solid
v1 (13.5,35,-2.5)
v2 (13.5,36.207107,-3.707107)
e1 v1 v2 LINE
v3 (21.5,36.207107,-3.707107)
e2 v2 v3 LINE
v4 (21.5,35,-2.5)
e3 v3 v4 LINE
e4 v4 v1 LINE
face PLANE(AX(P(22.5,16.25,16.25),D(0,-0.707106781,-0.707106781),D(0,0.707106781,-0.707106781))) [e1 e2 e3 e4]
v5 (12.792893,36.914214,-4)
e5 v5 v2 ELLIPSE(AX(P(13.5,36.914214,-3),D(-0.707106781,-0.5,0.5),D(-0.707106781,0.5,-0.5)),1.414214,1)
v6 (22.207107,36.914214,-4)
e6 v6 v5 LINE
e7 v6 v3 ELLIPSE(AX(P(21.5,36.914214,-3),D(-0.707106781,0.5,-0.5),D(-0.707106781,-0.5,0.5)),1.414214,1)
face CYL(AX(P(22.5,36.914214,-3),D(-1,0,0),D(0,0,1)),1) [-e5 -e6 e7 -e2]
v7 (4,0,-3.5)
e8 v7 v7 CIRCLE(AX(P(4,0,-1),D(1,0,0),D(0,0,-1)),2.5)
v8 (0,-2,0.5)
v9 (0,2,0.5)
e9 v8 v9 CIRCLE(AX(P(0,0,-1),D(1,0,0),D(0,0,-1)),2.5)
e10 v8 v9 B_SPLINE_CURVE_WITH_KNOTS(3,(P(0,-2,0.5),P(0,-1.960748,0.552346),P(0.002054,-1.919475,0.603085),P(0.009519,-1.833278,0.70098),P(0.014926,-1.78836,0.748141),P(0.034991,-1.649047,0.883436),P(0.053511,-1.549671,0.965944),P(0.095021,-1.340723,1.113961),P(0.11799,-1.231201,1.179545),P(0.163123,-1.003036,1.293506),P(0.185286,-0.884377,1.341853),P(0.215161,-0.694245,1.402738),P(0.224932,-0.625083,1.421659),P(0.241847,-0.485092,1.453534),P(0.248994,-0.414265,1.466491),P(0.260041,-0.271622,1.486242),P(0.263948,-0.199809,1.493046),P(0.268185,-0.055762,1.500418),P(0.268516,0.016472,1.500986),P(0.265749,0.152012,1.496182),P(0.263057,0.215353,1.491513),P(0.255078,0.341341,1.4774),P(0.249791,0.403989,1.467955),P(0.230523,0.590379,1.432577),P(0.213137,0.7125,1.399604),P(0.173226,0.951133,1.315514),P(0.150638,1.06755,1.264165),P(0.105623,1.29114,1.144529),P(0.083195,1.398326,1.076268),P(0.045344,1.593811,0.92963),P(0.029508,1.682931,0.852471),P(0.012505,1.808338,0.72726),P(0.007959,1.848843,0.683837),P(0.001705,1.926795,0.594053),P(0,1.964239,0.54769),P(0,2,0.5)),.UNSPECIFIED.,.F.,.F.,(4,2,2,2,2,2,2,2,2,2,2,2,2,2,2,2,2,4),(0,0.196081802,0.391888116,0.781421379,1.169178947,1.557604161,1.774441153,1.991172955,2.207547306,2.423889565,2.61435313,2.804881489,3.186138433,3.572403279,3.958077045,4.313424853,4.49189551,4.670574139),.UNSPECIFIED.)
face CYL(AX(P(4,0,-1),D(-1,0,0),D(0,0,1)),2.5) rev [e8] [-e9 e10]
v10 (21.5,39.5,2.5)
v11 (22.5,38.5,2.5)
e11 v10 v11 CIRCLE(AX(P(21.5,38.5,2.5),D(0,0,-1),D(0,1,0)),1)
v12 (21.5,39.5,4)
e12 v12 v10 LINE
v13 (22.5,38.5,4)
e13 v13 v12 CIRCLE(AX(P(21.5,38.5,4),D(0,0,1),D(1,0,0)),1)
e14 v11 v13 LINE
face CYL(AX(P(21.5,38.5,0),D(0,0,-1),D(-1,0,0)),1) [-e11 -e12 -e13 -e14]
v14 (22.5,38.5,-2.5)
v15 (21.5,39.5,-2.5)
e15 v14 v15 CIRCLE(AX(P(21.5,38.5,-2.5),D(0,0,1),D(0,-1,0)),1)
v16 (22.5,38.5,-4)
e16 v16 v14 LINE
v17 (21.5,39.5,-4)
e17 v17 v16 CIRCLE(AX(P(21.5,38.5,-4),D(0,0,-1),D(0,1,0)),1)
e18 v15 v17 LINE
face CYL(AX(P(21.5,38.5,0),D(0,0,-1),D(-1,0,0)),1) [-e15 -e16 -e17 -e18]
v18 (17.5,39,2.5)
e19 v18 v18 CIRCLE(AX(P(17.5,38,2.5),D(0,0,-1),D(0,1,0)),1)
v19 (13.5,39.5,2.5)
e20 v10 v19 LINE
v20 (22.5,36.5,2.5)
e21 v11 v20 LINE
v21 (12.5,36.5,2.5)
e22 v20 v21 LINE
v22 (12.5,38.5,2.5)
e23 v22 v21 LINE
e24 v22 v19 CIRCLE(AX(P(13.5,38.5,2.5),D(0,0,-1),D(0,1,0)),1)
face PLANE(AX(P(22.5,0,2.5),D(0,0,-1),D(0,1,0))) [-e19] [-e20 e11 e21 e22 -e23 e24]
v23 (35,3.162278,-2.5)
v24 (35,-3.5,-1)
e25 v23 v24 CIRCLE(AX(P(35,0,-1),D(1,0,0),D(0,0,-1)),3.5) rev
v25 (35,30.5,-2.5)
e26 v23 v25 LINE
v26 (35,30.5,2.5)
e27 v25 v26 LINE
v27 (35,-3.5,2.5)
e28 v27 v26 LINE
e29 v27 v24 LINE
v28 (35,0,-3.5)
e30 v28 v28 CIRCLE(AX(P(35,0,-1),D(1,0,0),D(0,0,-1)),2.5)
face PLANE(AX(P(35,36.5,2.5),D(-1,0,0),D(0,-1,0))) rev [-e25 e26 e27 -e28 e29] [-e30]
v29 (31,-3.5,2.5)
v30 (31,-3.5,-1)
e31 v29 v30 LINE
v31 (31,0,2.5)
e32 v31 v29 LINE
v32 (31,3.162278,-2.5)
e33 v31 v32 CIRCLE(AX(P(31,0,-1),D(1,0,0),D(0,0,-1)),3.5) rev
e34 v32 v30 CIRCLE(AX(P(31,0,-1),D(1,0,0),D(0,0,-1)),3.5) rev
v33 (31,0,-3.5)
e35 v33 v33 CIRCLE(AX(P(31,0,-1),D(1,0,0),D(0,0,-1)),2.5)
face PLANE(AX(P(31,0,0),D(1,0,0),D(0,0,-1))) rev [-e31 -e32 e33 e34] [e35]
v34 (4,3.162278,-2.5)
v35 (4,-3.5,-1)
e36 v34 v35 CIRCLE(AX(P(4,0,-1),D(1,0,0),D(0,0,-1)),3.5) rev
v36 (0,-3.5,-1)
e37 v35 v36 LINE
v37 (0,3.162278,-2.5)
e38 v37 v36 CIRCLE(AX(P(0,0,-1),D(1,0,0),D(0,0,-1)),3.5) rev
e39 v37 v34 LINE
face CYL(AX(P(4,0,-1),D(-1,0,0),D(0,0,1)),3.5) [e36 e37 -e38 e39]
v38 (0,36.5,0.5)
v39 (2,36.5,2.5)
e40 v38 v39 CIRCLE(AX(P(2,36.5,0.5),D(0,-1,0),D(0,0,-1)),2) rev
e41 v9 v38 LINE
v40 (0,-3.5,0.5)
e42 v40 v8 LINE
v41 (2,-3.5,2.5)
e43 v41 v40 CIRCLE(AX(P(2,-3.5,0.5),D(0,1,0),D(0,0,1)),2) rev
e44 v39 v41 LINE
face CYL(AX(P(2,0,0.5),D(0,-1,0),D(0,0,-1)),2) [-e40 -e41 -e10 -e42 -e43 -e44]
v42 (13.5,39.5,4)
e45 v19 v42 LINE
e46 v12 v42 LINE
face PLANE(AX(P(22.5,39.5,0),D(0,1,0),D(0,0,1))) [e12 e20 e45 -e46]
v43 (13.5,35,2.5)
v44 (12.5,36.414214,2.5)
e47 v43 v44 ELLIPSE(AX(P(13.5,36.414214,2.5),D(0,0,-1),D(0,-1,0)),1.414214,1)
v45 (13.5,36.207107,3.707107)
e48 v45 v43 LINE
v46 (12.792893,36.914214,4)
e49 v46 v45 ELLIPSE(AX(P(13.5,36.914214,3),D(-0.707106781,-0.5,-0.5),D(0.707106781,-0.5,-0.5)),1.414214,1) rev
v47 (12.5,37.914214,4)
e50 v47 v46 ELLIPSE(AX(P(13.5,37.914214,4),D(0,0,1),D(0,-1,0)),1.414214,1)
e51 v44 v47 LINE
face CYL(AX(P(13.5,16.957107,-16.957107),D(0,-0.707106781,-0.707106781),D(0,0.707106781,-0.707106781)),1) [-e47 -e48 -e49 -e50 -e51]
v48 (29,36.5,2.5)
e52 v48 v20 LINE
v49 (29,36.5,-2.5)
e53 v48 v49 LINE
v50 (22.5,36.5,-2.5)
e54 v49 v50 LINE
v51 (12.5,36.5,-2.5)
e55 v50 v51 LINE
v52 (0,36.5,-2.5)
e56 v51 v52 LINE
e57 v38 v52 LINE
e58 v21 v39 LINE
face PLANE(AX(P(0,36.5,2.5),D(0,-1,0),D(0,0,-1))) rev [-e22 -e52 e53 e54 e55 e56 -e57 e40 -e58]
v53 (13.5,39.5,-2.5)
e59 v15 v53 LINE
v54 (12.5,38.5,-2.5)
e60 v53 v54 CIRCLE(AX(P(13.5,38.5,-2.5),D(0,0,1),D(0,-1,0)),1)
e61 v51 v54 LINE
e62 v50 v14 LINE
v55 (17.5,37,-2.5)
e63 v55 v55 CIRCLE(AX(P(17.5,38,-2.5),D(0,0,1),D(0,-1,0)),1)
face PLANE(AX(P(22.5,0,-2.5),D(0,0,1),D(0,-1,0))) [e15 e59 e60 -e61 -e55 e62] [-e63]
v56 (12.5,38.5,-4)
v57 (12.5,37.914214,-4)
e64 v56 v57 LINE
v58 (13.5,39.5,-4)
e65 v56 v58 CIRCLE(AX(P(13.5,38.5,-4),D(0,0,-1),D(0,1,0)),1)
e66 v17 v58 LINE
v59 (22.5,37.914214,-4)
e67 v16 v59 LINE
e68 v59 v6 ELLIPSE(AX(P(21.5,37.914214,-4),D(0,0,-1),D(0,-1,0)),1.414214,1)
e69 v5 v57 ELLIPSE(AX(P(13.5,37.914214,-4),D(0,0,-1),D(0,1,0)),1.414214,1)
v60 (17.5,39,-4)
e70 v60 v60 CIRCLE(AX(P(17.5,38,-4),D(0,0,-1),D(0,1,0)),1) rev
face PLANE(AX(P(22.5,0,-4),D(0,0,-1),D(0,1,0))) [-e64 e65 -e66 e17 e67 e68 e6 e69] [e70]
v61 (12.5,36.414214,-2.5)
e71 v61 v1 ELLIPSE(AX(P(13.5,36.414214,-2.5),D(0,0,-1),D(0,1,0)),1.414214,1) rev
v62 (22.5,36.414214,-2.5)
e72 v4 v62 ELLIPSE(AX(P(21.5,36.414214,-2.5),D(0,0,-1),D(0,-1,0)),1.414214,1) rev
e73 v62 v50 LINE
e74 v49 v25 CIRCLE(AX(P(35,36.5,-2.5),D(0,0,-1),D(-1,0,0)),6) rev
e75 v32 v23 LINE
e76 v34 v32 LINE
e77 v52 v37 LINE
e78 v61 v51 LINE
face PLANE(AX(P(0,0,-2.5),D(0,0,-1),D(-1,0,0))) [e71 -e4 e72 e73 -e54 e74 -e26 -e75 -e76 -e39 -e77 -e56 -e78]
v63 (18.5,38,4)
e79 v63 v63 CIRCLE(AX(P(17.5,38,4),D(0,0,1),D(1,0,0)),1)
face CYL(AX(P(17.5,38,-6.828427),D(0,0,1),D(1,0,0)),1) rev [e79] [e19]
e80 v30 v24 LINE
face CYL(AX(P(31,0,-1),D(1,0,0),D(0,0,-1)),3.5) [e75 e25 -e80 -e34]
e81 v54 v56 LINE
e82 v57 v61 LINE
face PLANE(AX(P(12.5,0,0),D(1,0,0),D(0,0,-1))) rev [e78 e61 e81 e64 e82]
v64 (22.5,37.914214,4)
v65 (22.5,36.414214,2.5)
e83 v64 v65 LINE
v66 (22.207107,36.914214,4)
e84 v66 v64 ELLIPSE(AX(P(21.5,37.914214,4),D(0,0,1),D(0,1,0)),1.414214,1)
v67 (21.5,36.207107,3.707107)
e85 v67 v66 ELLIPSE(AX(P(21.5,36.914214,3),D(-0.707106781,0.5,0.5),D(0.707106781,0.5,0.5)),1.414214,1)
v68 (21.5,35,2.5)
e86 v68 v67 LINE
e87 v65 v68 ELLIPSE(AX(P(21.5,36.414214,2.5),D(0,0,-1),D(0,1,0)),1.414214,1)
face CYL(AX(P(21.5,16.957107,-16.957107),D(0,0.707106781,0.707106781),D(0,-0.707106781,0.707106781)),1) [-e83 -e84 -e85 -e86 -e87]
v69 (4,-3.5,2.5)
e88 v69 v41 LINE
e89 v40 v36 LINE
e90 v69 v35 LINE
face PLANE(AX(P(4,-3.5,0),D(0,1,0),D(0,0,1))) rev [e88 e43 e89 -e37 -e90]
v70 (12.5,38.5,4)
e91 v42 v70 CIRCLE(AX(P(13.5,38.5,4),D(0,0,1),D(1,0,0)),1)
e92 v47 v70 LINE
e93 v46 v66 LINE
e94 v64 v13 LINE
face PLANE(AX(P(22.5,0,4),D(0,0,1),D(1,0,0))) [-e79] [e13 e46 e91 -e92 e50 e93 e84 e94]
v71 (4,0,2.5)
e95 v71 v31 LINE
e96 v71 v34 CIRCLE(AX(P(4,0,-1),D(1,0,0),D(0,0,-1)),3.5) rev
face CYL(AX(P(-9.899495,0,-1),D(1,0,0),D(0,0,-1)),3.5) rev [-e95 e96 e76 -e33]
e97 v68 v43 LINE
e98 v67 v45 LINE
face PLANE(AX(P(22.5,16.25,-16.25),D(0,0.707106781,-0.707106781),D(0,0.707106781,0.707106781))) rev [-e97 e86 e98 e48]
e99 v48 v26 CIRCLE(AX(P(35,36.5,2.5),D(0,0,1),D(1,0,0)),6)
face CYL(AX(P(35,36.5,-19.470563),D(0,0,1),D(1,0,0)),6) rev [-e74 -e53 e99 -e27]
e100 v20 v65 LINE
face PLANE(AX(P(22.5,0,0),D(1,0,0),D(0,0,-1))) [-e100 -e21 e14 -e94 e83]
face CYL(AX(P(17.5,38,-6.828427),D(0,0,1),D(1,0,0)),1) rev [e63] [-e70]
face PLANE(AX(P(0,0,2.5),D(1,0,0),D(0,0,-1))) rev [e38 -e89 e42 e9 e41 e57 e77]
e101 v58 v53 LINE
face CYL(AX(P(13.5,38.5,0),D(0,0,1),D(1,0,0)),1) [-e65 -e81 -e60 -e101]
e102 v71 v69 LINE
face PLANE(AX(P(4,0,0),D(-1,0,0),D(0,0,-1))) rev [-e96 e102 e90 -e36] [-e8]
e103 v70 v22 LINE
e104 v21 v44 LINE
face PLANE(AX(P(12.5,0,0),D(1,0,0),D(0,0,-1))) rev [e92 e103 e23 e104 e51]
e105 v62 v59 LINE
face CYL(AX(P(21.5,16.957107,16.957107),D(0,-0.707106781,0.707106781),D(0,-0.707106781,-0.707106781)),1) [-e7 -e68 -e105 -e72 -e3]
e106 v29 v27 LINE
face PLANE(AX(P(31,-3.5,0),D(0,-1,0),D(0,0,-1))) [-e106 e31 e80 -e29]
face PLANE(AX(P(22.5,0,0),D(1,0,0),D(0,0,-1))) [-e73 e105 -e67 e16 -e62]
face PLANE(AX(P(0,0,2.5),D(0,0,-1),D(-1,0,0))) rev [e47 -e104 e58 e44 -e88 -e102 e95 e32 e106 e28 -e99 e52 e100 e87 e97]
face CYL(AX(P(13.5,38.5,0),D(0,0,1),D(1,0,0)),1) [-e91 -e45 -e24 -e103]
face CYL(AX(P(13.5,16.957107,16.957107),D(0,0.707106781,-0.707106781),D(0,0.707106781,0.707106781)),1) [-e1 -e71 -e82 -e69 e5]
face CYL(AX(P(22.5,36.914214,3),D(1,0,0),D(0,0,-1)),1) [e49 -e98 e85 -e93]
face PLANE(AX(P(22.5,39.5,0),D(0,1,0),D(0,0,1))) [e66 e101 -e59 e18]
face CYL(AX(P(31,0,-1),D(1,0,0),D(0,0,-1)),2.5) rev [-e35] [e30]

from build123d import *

# Parameters (mm, degrees)
SKETCH1_W           = 35
SKETCH1_H           = 36.5
BOSS_EXTRUDE1_DEPTH = 2.5
SKETCH3_R           = 3.5
CUT_EXTRUDE1_DEPTH  = 35
SKETCH4_R           = 2.5
BOSS_EXTRUDE3_DEPTH = 4
SKETCH5_W           = 1.5
SKETCH5_H           = 3
BOSS_EXTRUDE4_DEPTH = 5
CUT_EXTRUDE2_REACH  = 55.456
SKETCH6_R           = 1
FILLET1_R           = 1
FILLET2_R           = 1
SKETCH7_R           = 6
CUT_EXTRUDE3_DEPTH  = 5
FILLET3_R           = 2


with BuildPart() as part:
    # Sketch1 → Boss-Extrude1 (new, symmetric)
    with BuildSketch(Plane.XY):
        with Locations((17.5, 18.25)):
            Rectangle(SKETCH1_W, SKETCH1_H)
    extrude(amount=BOSS_EXTRUDE1_DEPTH, both=True)

    # Sketch3 → Cut-Extrude1 (cut)
    with BuildSketch(Plane(origin=(35, 0, 0), x_dir=(0, 0, -1), z_dir=(1, 0, 0))):
        with Locations((1, 0)):
            Circle(SKETCH3_R)
    extrude(amount=-CUT_EXTRUDE1_DEPTH, mode=Mode.SUBTRACT)

    # Sketch4 → Boss-Extrude3 (add)
    # profile 1 of 2: a face of its own
    with BuildSketch(Plane(origin=(35, 0, 0), x_dir=(0, 0, -1), z_dir=(1, 0, 0))):
        with BuildLine():
            ThreePointArc((2.5, 3.16227766), (-0.870828693, 2.958039892), (-2.5, 0))
            ThreePointArc((-2.5, 0), (-1.474873734, -2.474873734), (1, -3.5))
            ThreePointArc((1, -3.5), (3.474873734, -2.474873734), (4.5, 0))
            ThreePointArc((4.5, 0), (3.958039892, 1.870828693), (2.5, 3.16227766))
        make_face()
        with Locations((1, 0)):
            Circle(SKETCH4_R, mode=Mode.SUBTRACT)
    # profile 2 of 2: a face of its own
    with BuildSketch(Plane(origin=(35, 0, 0), x_dir=(0, 0, -1), z_dir=(1, 0, 0))):
        with BuildLine():
            ThreePointArc((1, -3.5), (-1.474873734, -2.474873734), (-2.5, 0))
            Line((-2.5, 0), (-2.5, -3.5))
            Line((-2.5, -3.5), (1, -3.5))
        make_face()
    boss_extrude3 = extrude(amount=-BOSS_EXTRUDE3_DEPTH)

    # Mirror2: Boss-Extrude3 across plane
    add(boss_extrude3.mirror(Plane(origin=(17.5, 0, 0), x_dir=(0, 0, 1), z_dir=(1, 0, 0))))

    # Sketch5 → Boss-Extrude4 (add, symmetric)
    with BuildSketch(Plane(origin=(17.5, 0, 0), x_dir=(0, 0, -1), z_dir=(1, 0, 0))):
        with Locations((-3.25, 38)):
            Rectangle(SKETCH5_W, SKETCH5_H)
        Polygon((-4, 36.5), (-2.5, 35), (-2.5, 36.5), align=None)
        Polygon((2.5, 35), (2.5, 36.5), (4, 36.5), align=None)
        with Locations((3.25, 38)):
            Rectangle(SKETCH5_W, SKETCH5_H)
    extrude(amount=BOSS_EXTRUDE4_DEPTH, both=True)

    # Cut-Extrude2: up to this face of the body (flat: up to its plane)
    cut_extrude2_end = Plane(part.part.faces().sort_by_distance((17.5, 38, -4))[0])
    # Sketch6 → Cut-Extrude2 (cut, up to the picked face)
    with BuildSketch(Plane.XY.offset(4), mode=Mode.PRIVATE) as cut_extrude2_sk1:
        with Locations(Location((17.5, 38, 0), (0, 0, 270))):
            Circle(SKETCH6_R)
    cut_extrude2_tool1 = split(extrude(cut_extrude2_sk1.sketch, amount=-CUT_EXTRUDE2_REACH, mode=Mode.PRIVATE), bisect_by=cut_extrude2_end, keep=Keep.BOTH, mode=Mode.PRIVATE)
    add(cut_extrude2_tool1.solids().sort_by(Axis((17.5, 38, 4), (0, 0, -1)))[0], mode=Mode.SUBTRACT)

    # Fillet1
    fillet1_edges = [part.edges().sort_by_distance(p)[0] for p in [
        (12.5, 35.75, 3.25),
        (17.5, 36.5, 4),
        (22.5, 35.75, 3.25),
        (22.5, 35.75, -3.25),
        (17.5, 36.5, -4),
        (12.5, 35.75, -3.25),
    ]]
    fillet(fillet1_edges, radius=FILLET1_R)

    # Fillet2
    fillet2_edges = [part.edges().sort_by_distance(p)[0] for p in [
        (22.5, 39.5, 3.25),
        (12.5, 39.5, 3.25),
        (22.5, 39.5, -3.25),
        (12.5, 39.5, -3.25),
    ]]
    fillet(fillet2_edges, radius=FILLET2_R)

    # Sketch7 → Cut-Extrude3 (cut)
    with BuildSketch(Plane.XY.offset(2.5)):
        with Locations((35, 36.5)):
            Circle(SKETCH7_R)
    extrude(amount=-CUT_EXTRUDE3_DEPTH, mode=Mode.SUBTRACT)

    # Fillet3
    # the kernel refuses this fillet: 2 mm, written as the material it takes off along each edge
    with BuildSketch(Plane(origin=(0, -8.5, 2.5), x_dir=(1, 0, 0), z_dir=(0, 1, 0))) as fillet3_piece_1:
        with BuildLine():
            CenterArc((FILLET3_R, FILLET3_R), FILLET3_R, 180, 90)
            Line((0, FILLET3_R), (0, 0))
            Line((0, 0), (FILLET3_R, 0))
        make_face()
    extrude(amount=50, mode=Mode.SUBTRACT)


solid = part.part
